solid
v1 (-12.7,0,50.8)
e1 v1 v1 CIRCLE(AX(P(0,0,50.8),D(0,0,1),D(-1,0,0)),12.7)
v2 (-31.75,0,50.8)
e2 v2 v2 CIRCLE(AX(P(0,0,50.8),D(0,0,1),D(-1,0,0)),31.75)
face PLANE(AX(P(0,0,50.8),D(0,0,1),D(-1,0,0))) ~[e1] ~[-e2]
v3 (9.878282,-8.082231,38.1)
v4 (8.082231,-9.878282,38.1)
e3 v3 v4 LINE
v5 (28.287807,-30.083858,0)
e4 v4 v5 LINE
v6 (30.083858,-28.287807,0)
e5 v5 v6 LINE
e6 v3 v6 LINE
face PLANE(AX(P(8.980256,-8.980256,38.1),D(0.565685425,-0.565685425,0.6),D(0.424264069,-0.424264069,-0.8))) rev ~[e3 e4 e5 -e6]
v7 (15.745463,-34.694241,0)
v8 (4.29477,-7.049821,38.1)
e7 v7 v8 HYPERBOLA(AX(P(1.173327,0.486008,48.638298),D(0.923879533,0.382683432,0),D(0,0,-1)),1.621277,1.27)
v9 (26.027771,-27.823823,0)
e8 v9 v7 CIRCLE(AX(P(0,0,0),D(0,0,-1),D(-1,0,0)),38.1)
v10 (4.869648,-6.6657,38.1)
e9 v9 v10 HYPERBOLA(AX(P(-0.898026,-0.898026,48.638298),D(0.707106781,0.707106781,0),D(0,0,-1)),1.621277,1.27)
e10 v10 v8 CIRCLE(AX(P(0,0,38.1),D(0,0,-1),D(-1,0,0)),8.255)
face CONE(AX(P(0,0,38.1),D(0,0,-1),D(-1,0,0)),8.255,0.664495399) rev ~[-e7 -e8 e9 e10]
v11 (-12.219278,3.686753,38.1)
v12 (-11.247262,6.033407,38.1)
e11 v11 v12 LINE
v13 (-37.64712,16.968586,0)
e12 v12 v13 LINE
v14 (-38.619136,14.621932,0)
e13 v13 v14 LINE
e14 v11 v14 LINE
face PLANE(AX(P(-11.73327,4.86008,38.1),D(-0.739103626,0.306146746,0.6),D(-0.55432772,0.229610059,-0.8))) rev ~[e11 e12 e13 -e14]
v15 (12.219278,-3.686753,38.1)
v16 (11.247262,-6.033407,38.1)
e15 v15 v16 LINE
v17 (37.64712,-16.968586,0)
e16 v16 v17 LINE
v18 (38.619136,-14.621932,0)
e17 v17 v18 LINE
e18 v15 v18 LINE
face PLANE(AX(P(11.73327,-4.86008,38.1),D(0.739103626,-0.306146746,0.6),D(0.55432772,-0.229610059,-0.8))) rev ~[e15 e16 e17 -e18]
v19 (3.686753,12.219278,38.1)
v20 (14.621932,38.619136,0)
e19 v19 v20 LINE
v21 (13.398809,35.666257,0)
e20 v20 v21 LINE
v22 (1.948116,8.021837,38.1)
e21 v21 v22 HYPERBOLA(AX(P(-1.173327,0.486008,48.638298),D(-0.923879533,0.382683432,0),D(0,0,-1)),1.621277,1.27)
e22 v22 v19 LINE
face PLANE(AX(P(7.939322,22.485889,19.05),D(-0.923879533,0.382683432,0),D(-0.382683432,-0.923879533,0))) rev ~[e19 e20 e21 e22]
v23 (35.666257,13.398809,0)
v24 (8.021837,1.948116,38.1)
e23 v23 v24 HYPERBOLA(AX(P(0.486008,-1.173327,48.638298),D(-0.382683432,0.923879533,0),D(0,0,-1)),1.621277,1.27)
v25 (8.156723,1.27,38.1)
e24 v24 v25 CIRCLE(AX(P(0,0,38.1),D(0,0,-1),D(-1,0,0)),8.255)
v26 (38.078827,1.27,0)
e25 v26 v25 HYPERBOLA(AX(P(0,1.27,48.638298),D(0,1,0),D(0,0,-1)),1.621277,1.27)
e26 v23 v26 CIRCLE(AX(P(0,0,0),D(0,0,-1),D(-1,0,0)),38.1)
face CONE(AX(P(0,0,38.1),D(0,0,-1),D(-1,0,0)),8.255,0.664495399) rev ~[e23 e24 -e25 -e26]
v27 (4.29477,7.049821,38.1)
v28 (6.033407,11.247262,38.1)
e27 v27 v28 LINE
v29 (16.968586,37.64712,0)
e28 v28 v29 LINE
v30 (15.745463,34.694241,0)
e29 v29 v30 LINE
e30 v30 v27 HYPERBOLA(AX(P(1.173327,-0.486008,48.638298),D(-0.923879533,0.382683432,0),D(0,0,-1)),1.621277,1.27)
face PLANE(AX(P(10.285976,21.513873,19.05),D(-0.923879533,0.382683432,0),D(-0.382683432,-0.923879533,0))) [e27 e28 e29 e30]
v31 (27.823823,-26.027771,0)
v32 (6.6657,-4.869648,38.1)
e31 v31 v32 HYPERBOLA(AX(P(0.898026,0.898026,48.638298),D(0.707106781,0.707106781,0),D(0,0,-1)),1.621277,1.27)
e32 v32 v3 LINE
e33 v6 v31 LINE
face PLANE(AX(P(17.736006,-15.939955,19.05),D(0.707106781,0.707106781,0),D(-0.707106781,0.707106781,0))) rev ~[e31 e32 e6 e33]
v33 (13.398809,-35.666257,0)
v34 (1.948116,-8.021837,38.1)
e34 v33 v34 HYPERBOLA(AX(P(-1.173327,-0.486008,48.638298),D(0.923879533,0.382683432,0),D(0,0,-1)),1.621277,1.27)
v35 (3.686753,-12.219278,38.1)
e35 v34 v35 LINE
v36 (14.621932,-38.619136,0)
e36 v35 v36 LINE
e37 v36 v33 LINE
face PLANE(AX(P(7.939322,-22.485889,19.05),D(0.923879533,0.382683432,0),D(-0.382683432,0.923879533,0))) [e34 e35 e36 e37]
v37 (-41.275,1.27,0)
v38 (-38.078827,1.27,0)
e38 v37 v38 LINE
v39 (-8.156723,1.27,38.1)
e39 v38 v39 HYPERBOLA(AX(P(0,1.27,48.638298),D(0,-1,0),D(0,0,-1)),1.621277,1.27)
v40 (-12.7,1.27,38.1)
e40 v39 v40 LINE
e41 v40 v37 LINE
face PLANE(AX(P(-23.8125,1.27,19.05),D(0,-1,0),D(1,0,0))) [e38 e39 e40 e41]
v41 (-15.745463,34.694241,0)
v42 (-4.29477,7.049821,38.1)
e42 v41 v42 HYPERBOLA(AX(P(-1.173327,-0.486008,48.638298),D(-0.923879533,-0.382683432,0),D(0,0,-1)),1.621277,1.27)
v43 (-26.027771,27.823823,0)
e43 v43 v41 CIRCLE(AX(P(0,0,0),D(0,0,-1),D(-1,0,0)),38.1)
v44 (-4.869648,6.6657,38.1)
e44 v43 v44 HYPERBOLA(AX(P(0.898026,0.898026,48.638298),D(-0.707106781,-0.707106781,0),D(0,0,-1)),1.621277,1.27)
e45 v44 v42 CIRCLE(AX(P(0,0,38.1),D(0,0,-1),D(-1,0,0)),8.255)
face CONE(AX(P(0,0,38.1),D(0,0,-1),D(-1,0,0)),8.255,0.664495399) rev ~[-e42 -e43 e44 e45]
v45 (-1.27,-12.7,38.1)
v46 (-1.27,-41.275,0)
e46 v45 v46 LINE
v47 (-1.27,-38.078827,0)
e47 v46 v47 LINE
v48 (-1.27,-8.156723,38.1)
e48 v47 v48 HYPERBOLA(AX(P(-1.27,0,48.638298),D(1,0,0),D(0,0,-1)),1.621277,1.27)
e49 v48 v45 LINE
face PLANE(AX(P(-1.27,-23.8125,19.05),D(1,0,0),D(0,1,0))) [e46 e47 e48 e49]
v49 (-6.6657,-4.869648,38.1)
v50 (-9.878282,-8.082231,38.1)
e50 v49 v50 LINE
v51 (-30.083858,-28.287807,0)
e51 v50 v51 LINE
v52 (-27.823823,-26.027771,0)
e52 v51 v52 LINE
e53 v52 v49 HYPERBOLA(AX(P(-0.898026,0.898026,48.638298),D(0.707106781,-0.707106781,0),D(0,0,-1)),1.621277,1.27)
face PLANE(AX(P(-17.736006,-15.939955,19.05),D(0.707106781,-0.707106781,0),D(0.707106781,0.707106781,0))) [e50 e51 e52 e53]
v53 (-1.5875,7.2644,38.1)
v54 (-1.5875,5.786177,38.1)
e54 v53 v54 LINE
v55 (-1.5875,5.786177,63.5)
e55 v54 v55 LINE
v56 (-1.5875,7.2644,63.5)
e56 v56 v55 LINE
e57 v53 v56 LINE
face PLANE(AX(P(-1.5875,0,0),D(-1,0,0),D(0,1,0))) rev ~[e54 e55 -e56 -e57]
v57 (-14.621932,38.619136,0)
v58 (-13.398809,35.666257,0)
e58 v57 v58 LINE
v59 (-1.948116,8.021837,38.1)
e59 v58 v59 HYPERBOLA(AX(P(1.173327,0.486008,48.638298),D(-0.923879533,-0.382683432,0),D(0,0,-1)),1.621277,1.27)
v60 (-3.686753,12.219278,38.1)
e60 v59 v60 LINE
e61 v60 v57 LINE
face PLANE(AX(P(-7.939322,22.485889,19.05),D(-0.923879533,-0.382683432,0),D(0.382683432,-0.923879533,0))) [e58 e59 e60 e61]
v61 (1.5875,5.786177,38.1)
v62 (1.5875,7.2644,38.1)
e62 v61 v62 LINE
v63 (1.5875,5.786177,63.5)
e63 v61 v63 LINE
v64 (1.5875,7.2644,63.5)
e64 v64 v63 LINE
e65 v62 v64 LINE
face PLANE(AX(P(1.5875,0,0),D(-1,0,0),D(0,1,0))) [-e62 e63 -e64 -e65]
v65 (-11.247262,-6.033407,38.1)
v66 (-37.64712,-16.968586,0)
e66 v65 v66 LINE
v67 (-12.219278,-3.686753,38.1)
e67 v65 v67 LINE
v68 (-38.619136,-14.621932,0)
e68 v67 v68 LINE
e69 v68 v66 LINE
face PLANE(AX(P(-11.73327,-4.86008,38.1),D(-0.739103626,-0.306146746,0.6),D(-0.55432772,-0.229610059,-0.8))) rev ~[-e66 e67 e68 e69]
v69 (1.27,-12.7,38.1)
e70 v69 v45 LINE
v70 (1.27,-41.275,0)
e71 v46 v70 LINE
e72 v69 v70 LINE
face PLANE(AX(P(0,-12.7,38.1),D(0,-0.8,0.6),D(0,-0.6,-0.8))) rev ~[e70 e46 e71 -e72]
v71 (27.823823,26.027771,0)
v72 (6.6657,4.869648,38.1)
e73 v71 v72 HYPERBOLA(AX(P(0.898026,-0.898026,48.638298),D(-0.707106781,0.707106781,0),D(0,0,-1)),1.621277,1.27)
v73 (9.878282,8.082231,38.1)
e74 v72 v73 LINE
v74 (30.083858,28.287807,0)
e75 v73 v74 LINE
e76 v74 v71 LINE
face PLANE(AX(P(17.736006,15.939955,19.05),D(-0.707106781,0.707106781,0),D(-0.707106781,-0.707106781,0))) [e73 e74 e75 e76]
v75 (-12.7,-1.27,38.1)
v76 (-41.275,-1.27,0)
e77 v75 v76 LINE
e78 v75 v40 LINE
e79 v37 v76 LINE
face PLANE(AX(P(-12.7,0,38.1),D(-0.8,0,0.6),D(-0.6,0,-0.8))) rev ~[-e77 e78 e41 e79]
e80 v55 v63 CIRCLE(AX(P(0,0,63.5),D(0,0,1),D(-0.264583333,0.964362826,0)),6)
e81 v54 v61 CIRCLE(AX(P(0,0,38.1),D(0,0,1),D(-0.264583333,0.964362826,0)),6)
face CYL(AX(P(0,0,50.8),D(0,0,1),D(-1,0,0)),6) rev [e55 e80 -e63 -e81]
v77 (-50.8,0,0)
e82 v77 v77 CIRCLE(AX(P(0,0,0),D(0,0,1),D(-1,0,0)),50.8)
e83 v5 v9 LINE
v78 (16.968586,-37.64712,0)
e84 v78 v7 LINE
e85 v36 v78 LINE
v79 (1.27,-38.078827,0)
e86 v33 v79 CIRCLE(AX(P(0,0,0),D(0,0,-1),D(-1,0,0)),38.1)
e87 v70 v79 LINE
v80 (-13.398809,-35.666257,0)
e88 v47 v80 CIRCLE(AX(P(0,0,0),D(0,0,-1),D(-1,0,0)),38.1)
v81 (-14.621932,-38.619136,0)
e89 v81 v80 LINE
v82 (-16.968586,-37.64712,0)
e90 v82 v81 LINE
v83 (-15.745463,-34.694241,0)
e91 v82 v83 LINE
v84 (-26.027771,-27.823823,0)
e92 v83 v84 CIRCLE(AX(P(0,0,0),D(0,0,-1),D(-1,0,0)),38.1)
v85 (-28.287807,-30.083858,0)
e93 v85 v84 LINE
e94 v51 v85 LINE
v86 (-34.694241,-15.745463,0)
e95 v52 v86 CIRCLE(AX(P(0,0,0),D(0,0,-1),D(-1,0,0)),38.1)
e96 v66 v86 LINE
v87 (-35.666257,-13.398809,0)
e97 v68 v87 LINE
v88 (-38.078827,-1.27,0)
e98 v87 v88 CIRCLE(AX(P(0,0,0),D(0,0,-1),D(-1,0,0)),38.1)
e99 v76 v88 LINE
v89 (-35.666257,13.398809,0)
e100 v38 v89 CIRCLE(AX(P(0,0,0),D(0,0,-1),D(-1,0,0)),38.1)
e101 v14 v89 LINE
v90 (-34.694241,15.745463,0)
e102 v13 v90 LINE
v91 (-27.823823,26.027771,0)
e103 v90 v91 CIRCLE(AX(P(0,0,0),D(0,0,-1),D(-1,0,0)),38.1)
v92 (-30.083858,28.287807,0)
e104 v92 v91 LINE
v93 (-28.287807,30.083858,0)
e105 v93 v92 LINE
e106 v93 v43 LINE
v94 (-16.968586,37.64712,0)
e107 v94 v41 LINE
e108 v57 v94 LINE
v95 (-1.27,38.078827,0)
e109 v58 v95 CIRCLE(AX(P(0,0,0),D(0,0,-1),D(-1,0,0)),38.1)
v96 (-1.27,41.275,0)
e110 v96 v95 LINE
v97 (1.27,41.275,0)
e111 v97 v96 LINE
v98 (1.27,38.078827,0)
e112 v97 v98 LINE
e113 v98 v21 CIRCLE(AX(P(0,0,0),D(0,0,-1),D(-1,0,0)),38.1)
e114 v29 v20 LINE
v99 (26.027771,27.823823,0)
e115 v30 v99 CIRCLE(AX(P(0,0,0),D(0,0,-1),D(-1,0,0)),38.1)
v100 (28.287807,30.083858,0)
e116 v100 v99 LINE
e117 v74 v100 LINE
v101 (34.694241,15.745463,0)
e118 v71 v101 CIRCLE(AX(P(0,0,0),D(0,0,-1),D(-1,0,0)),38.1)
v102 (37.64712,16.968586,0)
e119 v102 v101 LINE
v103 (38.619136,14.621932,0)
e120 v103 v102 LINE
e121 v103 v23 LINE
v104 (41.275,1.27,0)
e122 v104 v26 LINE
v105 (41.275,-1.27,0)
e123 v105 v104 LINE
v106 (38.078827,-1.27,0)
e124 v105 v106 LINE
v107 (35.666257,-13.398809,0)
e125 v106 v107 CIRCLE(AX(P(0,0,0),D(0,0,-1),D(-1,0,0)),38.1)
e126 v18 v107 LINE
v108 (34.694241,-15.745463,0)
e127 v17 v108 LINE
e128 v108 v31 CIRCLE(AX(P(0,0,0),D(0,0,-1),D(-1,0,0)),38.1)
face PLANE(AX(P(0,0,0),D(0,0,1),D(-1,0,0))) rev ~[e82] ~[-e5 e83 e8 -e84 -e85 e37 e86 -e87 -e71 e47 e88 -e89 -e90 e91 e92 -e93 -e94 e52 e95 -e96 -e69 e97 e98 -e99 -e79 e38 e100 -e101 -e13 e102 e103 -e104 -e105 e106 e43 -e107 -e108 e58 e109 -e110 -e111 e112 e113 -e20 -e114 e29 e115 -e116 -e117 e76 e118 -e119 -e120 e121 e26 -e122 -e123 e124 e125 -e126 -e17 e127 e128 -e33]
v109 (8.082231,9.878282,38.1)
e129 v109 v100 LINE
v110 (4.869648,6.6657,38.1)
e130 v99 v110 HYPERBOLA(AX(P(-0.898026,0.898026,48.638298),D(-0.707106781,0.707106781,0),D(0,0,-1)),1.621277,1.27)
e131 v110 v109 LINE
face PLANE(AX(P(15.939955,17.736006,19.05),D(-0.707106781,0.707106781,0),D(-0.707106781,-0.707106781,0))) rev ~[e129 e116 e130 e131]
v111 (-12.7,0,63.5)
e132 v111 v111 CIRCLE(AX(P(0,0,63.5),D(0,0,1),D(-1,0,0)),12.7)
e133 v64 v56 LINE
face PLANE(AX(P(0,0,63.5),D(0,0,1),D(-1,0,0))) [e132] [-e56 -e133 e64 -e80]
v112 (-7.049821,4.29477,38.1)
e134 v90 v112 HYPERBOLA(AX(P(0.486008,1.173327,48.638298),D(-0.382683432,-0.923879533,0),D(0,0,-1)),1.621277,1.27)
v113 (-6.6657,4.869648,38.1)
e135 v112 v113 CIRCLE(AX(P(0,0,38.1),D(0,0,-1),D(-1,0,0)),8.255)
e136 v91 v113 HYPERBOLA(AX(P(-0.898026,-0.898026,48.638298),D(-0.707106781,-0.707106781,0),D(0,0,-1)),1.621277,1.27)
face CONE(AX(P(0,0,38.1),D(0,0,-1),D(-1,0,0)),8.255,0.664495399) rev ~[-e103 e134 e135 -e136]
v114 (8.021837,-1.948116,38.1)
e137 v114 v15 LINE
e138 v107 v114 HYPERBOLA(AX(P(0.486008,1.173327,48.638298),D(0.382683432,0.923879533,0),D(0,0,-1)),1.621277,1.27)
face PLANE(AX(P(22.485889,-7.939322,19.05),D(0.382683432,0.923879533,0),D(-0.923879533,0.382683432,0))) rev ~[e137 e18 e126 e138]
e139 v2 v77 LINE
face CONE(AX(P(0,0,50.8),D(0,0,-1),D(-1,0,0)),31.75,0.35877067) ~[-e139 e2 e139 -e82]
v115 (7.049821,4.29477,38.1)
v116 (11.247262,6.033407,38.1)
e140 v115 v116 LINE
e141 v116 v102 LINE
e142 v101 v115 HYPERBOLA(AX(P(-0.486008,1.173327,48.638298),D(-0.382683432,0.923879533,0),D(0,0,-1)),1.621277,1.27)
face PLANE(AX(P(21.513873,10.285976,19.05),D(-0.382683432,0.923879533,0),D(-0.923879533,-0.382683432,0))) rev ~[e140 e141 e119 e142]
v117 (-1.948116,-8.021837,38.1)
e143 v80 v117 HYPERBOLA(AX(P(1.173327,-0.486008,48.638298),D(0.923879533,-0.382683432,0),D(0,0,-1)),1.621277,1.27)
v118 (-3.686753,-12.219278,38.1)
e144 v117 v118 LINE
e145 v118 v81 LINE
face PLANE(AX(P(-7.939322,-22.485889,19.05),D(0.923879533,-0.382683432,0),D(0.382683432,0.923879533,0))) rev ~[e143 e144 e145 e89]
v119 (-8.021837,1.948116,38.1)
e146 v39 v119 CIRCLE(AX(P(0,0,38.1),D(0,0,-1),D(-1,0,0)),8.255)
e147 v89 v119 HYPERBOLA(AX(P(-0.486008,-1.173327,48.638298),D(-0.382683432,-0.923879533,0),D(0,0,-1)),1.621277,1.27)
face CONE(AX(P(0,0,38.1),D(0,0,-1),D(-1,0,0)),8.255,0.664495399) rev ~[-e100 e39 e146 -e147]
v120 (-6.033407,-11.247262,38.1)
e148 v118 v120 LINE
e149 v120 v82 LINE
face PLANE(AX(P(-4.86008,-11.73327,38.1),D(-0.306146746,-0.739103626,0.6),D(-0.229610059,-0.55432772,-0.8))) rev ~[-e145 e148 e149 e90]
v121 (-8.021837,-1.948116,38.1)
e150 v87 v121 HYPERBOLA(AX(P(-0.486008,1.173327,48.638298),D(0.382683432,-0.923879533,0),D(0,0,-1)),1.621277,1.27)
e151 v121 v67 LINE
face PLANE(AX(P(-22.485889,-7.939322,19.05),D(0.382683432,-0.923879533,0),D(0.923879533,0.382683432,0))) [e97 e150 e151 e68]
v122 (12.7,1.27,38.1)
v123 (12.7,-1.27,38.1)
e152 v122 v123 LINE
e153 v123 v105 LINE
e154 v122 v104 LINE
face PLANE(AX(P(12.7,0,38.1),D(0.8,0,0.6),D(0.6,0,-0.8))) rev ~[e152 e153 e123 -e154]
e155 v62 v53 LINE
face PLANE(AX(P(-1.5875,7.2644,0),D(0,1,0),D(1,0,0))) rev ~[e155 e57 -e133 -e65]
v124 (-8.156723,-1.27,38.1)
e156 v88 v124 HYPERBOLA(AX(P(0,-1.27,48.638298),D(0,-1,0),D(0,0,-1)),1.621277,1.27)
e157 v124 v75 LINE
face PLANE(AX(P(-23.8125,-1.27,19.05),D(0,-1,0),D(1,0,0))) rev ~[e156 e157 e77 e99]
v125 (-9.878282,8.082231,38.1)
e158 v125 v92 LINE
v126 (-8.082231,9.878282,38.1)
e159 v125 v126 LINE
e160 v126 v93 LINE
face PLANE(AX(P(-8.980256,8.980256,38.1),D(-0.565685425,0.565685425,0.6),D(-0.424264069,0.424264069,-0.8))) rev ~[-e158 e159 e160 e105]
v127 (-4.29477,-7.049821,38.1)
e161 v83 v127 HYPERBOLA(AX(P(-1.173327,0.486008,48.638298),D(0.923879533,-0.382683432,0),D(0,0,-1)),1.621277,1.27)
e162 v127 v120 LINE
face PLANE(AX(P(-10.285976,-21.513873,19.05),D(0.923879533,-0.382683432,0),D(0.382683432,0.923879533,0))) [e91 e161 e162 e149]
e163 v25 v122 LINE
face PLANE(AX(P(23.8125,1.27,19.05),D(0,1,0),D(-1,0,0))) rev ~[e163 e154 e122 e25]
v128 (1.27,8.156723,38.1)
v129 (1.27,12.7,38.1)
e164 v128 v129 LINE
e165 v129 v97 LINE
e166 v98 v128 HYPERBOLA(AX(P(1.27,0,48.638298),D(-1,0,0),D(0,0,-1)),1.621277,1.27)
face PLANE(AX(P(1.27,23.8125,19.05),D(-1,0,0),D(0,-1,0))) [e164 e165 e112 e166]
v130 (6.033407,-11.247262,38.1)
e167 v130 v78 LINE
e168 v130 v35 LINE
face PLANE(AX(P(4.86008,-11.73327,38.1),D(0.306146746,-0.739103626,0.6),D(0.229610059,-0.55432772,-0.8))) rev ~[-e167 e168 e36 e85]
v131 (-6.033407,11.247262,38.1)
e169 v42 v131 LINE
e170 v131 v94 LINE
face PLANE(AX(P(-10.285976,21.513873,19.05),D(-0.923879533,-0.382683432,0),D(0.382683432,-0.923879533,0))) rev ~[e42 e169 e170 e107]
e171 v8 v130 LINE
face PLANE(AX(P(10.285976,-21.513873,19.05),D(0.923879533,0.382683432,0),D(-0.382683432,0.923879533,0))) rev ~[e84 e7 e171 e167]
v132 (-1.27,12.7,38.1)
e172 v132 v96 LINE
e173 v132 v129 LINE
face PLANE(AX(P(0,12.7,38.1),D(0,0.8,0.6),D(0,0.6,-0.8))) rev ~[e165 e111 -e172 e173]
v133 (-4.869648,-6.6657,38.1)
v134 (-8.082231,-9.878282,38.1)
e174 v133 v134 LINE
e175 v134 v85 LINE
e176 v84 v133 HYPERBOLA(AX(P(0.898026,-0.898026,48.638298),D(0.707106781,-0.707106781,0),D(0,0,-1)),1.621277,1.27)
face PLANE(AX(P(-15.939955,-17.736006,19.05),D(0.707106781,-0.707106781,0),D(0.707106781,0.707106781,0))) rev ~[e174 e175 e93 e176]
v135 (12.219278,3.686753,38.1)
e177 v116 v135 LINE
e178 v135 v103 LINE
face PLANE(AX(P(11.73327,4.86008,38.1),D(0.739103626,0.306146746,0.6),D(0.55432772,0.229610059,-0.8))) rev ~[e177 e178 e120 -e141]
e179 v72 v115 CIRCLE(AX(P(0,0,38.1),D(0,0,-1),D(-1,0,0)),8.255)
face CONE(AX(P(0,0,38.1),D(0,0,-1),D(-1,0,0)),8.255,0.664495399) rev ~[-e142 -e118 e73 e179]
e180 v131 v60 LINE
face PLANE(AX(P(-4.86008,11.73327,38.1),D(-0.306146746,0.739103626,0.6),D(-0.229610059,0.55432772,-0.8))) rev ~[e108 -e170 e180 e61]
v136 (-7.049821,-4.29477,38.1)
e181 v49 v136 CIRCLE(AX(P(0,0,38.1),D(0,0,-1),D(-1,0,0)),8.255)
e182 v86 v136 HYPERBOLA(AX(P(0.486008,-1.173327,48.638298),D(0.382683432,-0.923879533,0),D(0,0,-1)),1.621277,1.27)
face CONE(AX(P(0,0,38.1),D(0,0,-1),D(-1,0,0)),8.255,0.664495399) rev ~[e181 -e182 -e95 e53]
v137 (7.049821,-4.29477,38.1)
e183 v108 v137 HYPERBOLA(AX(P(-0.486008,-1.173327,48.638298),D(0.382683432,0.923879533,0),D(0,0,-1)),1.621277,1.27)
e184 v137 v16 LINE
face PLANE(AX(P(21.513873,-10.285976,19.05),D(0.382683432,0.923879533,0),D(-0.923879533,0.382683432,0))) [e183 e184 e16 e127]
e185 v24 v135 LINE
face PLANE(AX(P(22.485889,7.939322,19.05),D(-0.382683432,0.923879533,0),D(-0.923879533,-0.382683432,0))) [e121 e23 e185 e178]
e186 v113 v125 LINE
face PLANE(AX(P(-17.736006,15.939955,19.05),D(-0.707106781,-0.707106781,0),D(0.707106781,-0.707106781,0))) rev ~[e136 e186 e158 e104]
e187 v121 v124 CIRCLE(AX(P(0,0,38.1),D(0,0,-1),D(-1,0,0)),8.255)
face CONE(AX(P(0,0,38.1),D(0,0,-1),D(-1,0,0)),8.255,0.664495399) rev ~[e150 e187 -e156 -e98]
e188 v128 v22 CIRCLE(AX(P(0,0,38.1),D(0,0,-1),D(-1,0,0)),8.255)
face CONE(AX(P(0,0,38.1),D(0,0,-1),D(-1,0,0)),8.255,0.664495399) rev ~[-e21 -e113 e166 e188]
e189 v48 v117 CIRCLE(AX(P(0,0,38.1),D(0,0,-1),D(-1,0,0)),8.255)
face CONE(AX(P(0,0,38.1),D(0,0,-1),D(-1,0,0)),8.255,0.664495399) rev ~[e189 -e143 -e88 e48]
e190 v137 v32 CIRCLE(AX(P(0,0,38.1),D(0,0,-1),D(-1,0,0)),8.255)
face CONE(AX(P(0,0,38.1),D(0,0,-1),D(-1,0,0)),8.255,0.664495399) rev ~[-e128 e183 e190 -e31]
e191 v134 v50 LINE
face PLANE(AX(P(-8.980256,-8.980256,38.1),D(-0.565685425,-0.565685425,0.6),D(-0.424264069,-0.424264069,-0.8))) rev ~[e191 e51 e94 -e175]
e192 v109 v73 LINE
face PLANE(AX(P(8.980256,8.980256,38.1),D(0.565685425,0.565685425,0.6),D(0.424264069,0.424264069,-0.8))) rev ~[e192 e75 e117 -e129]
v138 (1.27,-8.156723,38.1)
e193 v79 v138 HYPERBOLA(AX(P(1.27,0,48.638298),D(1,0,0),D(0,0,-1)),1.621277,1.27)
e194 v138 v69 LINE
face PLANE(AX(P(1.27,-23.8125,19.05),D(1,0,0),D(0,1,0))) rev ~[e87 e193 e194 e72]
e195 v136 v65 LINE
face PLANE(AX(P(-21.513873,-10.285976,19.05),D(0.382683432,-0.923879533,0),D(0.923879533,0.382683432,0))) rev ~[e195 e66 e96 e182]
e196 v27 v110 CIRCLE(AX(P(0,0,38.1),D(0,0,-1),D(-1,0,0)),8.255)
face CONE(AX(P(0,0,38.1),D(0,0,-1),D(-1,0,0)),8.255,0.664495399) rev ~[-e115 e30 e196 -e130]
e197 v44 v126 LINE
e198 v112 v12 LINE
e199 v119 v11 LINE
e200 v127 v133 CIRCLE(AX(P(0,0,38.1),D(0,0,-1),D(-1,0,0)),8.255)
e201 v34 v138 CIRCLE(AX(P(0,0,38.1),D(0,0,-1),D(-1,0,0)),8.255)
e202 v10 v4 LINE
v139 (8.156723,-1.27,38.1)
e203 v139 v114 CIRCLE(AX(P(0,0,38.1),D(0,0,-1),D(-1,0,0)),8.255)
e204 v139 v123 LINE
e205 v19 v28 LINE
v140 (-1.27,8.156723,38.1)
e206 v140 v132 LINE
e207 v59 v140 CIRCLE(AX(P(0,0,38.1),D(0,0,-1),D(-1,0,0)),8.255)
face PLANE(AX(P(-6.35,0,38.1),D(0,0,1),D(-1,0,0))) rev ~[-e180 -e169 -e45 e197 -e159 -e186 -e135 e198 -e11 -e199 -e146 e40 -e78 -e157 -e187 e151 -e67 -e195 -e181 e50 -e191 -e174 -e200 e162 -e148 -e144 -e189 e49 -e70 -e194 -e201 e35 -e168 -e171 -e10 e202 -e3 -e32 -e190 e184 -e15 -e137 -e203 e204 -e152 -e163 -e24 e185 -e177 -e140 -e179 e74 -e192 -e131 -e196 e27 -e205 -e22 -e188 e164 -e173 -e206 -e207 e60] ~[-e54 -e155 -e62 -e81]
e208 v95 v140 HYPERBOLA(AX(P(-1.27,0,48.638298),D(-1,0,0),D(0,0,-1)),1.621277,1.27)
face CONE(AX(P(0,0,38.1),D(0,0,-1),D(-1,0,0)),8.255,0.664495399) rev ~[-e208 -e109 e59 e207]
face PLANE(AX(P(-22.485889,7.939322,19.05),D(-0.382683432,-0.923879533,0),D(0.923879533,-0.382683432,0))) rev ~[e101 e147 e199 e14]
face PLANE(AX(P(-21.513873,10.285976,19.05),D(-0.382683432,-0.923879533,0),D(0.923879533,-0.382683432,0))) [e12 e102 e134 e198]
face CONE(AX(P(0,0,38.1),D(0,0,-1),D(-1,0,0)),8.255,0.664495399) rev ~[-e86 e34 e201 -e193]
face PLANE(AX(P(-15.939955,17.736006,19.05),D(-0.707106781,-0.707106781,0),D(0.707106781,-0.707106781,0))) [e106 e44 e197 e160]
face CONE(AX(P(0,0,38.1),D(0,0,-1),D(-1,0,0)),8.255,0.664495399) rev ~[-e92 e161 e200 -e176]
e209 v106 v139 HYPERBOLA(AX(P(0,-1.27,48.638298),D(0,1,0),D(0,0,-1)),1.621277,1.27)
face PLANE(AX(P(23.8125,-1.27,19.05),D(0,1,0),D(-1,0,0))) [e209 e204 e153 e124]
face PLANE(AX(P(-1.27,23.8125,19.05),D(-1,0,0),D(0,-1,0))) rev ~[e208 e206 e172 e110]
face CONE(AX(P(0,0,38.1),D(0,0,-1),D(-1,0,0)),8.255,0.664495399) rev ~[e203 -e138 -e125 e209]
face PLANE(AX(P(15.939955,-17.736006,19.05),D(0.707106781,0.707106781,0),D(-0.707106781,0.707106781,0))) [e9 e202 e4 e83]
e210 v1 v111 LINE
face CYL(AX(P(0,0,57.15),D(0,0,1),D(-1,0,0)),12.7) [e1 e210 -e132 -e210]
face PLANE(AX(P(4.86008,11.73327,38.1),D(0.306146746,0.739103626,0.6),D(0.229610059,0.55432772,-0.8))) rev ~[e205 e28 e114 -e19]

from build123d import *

# Parameters (mm, degrees)
F0_W            = 12.7
F0_H            = 12.7
F2_W            = 6
F2_H            = 25.4
F4_W            = 3.175
F4_H            = 7.2644
F5_DEPTH        = 63.501
F7_DEPTH        = 1.27
F7_COPIES_COUNT = 16


# Not quite as in the source:
# - a pattern or mirror of a feature is missing from the dataset's text; its kind, count and spacing are read off the source's solid


with BuildPart() as f1:
    # F0 (on Front) → F1 (revolve)
    with BuildSketch(Plane.XZ):
        Polygon((-50.8, 0), (0, 0), (0, 50.8), (-12.7, 50.8), (-31.75, 50.8), align=None)
        with Locations((-6.35, 57.15)):
            Rectangle(F0_W, F0_H)
    revolve(axis=Axis((0, 0, 25.4), (0, 0, 1)))

    # F2 (on Front) → F3 (revolve, cut)
    with BuildSketch(Plane.XZ):
        Polygon((-8.255, 38.1), (-38.1, 0), (0, 0), (0, 38.1), (-6, 38.1), align=None)
        with Locations((-3, 50.8)):
            Rectangle(F2_W, F2_H)
    revolve(axis=Axis((0, 0, 19.05), (0, 0, -1)), mode=Mode.SUBTRACT)

    # F4 (on Top) → F5 (cut, through all)
    with BuildSketch(Plane.XY):
        with Locations((0, 3.6322)):
            Rectangle(F4_W, F4_H)
    extrude(amount=F5_DEPTH, mode=Mode.SUBTRACT)

    # F6 (on Front) → F7 (cut, symmetric)
    with BuildSketch(Plane.XZ):
        Polygon((-12.7, 38.1), (-41.275, 0), (-34.925, 0), (-6.35, 38.1), align=None)
    f7 = extrude(amount=F7_DEPTH, both=True, mode=Mode.SUBTRACT)

    # F7_copies: F7 ×16 about axis
    f7_copies_axis = Axis((0, 0, 0), (0, 0, 1))
    for i in range(1, F7_COPIES_COUNT):
        add(f7.rotate(f7_copies_axis, i * 360 / F7_COPIES_COUNT), mode=Mode.SUBTRACT)


solid = f1.part
